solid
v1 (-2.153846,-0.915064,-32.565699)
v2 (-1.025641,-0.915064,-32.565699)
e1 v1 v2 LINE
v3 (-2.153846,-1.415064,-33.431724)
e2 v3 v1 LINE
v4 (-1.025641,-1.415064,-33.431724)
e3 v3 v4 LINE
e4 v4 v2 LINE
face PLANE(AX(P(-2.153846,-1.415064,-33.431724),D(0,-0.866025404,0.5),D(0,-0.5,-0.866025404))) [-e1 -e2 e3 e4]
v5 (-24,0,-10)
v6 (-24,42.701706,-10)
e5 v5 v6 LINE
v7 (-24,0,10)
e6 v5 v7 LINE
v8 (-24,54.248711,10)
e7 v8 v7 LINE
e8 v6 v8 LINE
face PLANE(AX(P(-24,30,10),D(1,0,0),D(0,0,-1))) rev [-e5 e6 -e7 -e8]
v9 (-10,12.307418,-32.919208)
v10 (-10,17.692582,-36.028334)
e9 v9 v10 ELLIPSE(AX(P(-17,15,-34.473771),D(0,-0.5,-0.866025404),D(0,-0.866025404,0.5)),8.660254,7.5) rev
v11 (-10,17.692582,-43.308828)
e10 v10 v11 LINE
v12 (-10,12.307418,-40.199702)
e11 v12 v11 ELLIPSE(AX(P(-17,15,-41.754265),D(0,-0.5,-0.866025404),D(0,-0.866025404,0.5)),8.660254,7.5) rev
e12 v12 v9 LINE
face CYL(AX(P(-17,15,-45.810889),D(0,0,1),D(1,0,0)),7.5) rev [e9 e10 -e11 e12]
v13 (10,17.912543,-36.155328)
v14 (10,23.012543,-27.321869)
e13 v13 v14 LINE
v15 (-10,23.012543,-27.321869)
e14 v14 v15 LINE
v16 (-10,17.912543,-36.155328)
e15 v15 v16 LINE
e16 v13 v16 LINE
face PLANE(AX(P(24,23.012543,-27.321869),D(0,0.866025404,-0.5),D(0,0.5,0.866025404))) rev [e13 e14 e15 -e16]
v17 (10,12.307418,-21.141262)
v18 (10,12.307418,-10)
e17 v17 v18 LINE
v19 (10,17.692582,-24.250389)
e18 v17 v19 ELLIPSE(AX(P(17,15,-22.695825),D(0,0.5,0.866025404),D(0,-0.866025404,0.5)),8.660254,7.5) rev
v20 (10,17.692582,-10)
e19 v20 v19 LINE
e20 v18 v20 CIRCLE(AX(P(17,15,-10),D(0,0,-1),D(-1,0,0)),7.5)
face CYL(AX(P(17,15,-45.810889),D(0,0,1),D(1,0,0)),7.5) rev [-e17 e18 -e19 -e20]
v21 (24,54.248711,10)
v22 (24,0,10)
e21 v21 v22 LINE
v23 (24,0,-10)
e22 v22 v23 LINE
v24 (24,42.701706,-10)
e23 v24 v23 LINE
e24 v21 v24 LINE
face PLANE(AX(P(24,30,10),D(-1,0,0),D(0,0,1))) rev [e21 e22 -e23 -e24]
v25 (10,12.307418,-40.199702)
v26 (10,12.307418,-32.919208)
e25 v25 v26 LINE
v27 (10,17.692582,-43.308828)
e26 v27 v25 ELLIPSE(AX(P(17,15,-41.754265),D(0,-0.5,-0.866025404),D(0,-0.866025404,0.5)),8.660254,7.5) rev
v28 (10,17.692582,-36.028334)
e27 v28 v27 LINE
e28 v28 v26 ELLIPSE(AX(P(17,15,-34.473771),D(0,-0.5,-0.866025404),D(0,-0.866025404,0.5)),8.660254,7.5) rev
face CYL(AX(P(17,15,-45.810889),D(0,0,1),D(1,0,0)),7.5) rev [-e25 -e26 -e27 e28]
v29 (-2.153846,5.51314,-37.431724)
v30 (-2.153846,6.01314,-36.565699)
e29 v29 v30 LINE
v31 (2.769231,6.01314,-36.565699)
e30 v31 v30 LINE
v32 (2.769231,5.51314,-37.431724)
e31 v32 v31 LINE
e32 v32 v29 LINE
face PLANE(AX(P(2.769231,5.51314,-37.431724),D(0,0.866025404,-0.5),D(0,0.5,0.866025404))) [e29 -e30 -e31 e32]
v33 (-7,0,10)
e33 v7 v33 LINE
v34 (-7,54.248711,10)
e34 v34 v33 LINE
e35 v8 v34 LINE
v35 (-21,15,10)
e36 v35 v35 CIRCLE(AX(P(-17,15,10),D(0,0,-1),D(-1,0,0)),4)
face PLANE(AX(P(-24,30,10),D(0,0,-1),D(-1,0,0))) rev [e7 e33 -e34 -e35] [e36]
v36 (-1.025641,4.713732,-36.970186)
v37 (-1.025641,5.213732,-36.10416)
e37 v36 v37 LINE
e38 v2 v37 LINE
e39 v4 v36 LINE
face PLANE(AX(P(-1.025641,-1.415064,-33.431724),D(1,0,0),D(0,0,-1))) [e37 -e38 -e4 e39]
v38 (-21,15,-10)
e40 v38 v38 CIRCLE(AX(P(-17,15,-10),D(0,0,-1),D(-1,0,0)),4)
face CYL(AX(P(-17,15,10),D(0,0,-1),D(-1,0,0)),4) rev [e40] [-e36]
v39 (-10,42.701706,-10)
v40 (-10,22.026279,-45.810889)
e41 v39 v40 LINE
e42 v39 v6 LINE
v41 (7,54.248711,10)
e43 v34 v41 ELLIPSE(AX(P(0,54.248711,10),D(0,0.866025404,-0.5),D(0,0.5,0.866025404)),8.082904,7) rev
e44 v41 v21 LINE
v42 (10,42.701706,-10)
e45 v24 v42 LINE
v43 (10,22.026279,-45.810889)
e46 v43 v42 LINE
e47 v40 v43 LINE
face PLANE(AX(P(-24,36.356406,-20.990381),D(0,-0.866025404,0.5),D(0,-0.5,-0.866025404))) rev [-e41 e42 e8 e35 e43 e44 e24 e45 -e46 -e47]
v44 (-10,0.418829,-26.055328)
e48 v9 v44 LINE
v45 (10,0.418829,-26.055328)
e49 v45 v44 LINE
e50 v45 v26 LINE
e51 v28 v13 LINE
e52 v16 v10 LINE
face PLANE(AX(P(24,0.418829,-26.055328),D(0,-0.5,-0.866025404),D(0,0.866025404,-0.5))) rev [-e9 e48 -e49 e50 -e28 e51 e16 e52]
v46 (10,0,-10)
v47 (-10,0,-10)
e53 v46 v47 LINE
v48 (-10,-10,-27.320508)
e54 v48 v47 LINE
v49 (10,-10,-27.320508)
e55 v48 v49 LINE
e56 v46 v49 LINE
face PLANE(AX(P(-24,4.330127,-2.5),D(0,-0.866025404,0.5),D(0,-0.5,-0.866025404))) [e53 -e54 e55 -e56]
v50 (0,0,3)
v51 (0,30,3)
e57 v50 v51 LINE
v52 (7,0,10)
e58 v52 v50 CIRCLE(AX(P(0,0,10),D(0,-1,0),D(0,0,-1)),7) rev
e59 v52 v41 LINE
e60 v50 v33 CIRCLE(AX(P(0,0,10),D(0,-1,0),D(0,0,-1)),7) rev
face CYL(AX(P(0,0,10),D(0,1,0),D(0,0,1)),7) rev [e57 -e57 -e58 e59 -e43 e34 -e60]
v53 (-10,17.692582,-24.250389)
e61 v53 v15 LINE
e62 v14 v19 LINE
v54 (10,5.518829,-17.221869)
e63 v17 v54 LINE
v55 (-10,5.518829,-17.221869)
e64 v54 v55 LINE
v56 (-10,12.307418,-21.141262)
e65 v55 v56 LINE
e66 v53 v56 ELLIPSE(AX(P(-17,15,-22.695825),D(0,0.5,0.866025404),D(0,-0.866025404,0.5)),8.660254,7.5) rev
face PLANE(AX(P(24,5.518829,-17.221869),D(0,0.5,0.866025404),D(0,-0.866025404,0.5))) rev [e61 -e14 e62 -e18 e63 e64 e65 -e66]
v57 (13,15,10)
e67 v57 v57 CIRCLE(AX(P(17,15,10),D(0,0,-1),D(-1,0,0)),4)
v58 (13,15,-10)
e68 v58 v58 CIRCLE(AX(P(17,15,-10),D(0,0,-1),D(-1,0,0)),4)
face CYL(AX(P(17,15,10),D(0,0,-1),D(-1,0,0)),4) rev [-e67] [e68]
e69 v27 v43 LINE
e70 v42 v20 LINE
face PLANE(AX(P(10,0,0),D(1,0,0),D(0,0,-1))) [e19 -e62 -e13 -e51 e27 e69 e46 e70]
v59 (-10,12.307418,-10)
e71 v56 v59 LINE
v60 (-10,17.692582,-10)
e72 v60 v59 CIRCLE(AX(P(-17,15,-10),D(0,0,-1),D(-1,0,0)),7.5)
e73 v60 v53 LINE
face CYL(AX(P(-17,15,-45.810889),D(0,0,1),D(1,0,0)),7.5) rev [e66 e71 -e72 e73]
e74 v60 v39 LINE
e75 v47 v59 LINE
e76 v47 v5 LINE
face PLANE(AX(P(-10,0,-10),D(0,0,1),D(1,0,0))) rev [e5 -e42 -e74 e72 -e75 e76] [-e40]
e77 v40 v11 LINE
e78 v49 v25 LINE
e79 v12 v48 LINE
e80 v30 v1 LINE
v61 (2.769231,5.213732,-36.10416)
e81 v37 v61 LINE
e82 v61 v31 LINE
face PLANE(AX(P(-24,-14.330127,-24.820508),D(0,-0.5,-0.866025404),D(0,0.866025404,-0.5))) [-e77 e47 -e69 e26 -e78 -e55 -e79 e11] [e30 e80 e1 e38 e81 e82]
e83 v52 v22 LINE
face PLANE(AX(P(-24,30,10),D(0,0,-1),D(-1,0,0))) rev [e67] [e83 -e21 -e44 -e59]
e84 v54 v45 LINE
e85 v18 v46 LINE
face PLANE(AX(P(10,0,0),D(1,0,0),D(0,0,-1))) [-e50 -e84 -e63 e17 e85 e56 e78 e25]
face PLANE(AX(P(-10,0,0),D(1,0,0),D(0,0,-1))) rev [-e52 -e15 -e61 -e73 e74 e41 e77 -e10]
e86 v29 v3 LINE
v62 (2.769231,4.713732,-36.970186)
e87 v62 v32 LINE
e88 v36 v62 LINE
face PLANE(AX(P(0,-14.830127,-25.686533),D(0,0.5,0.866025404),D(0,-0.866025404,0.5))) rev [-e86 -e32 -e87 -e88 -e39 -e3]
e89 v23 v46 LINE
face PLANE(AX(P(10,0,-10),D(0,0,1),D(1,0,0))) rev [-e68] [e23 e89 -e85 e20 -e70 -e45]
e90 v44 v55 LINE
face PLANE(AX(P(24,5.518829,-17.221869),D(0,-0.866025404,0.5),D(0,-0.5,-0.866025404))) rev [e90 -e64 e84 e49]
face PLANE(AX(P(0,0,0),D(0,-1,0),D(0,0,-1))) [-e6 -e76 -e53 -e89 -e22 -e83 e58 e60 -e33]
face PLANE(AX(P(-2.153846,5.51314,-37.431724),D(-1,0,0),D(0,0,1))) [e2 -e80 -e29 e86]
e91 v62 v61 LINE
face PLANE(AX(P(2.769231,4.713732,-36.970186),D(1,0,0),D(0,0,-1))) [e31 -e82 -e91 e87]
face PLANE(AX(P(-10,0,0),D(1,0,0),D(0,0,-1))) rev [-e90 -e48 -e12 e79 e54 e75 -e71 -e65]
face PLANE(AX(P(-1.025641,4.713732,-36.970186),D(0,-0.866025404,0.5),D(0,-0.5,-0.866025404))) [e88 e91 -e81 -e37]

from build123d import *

# Parameters (mm, degrees)
SKETCH_1_W              = 48
SKETCH_1_H              = 20
EXTRUDE_1_DEPTH         = 30
SKETCH_2_W              = 14
SKETCH_2_H              = 30
CUT_EXTRUDE_1_DEPTH     = 7
EXTRUDE_2_DEPTH         = 48
CUT_EXTRUDE_2_DEPTH     = 14
CUT_EXTRUDE_3_DEPTH     = 14
CUT_EXTRUDE_4_DEPTH     = 65.456478054
SKETCH_13_R             = 4
CUT_EXTRUDE_5_DEPTH     = 53.52066051
SKETCH_14_R             = 4
CUT_EXTRUDE_6_DEPTH     = 53.52066051
FILLET_1_R              = 7
EXTRUDE_5_DEPTH         = 1
SKETCH_20_R             = 7.5
CUT_EXTRUDE_8_DEPTH     = 53.52066051
BOSS_EXTRUDE1_DEPTH     = 25
CUT_EXTRUDE1_DEPTH      = 80.244164221
CUT_EXTRUDE1_DEPTH_BACK = 80.244164221


with BuildPart() as part:
    # Эскиз1 → Бобышка-Вытянуть1 (new body)
    with BuildSketch(Plane(origin=(0, 0, 0), x_dir=(1, 0, 0), z_dir=(0, 1, 0))):
        Rectangle(SKETCH_1_W, SKETCH_1_H)
    extrude(amount=EXTRUDE_1_DEPTH)

    # Эскиз2 → Вырез-Вытянуть1 (cut)
    with BuildSketch(Plane.XY.offset(10)):
        with Locations((0, 15)):
            Rectangle(SKETCH_2_W, SKETCH_2_H)
    extrude(amount=-CUT_EXTRUDE_1_DEPTH, mode=Mode.SUBTRACT)

    # Эскиз7 → Бобышка-Вытянуть2 (add)
    with BuildSketch(Plane(origin=(24, 0, 0), x_dir=(0, 0, -1), z_dir=(1, 0, 0))):
        Polygon((10, 0), (27.320508076, -10), (45.810889132, 22.026279442), (32, 30), (10, 30), align=None)
    extrude(amount=-EXTRUDE_2_DEPTH)

    # Эскиз8 → Вырез-Вытянуть2 (cut)
    with BuildSketch(Plane(origin=(24, 0, 0), x_dir=(0, 0, -1), z_dir=(1, 0, 0))):
        Polygon((10, 0), (10, 30), (32, 30), (45.810889132, 22.026279442), (27.320508076, -10), align=None)
    extrude(amount=-CUT_EXTRUDE_2_DEPTH, mode=Mode.SUBTRACT)

    # Эскиз9 → Вырез-Вытянуть3 (cut)
    with BuildSketch(Plane.ZY.offset(24)):
        Polygon((-10, 0), (-10, 30), (-32, 30), (-45.810889132, 22.026279442), (-27.320508076, -10), align=None)
    extrude(amount=-CUT_EXTRUDE_3_DEPTH, mode=Mode.SUBTRACT)

    # Эскиз11 → Вырез-Вытянуть4 (cut, through all)
    with BuildSketch(Plane.ZY.offset(10)):
        Polygon((-17.221869062, 5.518829477), (-27.321869062, 23.012542633), (-36.15532818, 17.912542633), (-26.05532818, 0.418829477), align=None)
    extrude(amount=-CUT_EXTRUDE_4_DEPTH, mode=Mode.SUBTRACT)

    # Эскиз13 → Вырез-Вытянуть5 (cut, through all)
    with BuildSketch(Plane(origin=(0, 0, -10), x_dir=(-1, 0, 0), z_dir=(0, 0, -1))):
        with Locations((17, 15)):
            Circle(SKETCH_13_R)
    extrude(amount=-CUT_EXTRUDE_5_DEPTH, mode=Mode.SUBTRACT)

    # Эскиз14 → Вырез-Вытянуть6 (cut, through all)
    with BuildSketch(Plane(origin=(0, 0, -10), x_dir=(-1, 0, 0), z_dir=(0, 0, -1))):
        with Locations((-17, 15)):
            Circle(SKETCH_14_R)
    extrude(amount=-CUT_EXTRUDE_6_DEPTH, mode=Mode.SUBTRACT)

    # Скругление1
    fillet_1_edges = [part.edges().sort_by_distance(p)[0] for p in [
        (-7, 15, 3),
        (7, 15, 3),
    ]]
    fillet(fillet_1_edges, radius=FILLET_1_R - 0.0001)  # a hair under: the kernel refuses the full size

    # Эскиз18 → Бобышка-Вытянуть5 (add)
    with BuildSketch(Plane(origin=(0, -14.330127019, -24.820508076), x_dir=(-1, 0, 0), z_dir=(0, -0.49999999999998845, -0.8660254037844453))):
        Polygon((2.153846154, 23.490381057), (2.153846154, 15.490381057), (1.025641026, 15.490381057), (1.025641026, 22.567304134), (-2.769230769, 22.567304134), (-2.769230769, 23.490381057), align=None)
    extrude(amount=EXTRUDE_5_DEPTH)

    # Эскиз20 → Вырез-Вытянуть8 (cut, through all)
    with BuildSketch(Plane(origin=(0, 0, -10), x_dir=(-1, 0, 0), z_dir=(0, 0, -1))):
        with Locations((-17, 15)):
            Circle(SKETCH_20_R)
        with Locations((17, 15)):
            Circle(SKETCH_20_R)
    extrude(amount=CUT_EXTRUDE_8_DEPTH, mode=Mode.SUBTRACT)

    # Sketch3 → Boss-Extrude1 (add)
    with BuildSketch(Plane(origin=(0, 30, 0), x_dir=(1, 0, 0), z_dir=(0, 1, 0))):
        with BuildLine():
            Line((7, -10), (24, -10))
            Line((24, -10), (24, 10))
            Line((24, 10), (10, 10))
            Line((10, 10), (10, 32))
            Line((10, 32), (-10, 32))
            Line((-10, 32), (-10, 10))
            Line((-10, 10), (-24, 10))
            Line((-24, 10), (-24, -10))
            Line((-24, -10), (-7, -10))
            ThreePointArc((-7, -10), (0, -3), (7, -10))
        make_face()
    extrude(amount=BOSS_EXTRUDE1_DEPTH)

    # Sketch4 → Cut-Extrude1 (cut, two sides: drawn at the far end of the back side and taken through both)
    with BuildSketch(Plane.ZY.offset(10).offset(-CUT_EXTRUDE1_DEPTH_BACK)):
        Polygon((-251.050138341, -96.468656337), (-45.810889132, 22.026279442), (35.63071017, 69.046608722), (240.869959379, 187.541544501), (3.880087821, 598.020042918), (-488.040009899, 314.00984208), align=None)
    extrude(amount=CUT_EXTRUDE1_DEPTH + CUT_EXTRUDE1_DEPTH_BACK, mode=Mode.SUBTRACT)


solid = part.part
